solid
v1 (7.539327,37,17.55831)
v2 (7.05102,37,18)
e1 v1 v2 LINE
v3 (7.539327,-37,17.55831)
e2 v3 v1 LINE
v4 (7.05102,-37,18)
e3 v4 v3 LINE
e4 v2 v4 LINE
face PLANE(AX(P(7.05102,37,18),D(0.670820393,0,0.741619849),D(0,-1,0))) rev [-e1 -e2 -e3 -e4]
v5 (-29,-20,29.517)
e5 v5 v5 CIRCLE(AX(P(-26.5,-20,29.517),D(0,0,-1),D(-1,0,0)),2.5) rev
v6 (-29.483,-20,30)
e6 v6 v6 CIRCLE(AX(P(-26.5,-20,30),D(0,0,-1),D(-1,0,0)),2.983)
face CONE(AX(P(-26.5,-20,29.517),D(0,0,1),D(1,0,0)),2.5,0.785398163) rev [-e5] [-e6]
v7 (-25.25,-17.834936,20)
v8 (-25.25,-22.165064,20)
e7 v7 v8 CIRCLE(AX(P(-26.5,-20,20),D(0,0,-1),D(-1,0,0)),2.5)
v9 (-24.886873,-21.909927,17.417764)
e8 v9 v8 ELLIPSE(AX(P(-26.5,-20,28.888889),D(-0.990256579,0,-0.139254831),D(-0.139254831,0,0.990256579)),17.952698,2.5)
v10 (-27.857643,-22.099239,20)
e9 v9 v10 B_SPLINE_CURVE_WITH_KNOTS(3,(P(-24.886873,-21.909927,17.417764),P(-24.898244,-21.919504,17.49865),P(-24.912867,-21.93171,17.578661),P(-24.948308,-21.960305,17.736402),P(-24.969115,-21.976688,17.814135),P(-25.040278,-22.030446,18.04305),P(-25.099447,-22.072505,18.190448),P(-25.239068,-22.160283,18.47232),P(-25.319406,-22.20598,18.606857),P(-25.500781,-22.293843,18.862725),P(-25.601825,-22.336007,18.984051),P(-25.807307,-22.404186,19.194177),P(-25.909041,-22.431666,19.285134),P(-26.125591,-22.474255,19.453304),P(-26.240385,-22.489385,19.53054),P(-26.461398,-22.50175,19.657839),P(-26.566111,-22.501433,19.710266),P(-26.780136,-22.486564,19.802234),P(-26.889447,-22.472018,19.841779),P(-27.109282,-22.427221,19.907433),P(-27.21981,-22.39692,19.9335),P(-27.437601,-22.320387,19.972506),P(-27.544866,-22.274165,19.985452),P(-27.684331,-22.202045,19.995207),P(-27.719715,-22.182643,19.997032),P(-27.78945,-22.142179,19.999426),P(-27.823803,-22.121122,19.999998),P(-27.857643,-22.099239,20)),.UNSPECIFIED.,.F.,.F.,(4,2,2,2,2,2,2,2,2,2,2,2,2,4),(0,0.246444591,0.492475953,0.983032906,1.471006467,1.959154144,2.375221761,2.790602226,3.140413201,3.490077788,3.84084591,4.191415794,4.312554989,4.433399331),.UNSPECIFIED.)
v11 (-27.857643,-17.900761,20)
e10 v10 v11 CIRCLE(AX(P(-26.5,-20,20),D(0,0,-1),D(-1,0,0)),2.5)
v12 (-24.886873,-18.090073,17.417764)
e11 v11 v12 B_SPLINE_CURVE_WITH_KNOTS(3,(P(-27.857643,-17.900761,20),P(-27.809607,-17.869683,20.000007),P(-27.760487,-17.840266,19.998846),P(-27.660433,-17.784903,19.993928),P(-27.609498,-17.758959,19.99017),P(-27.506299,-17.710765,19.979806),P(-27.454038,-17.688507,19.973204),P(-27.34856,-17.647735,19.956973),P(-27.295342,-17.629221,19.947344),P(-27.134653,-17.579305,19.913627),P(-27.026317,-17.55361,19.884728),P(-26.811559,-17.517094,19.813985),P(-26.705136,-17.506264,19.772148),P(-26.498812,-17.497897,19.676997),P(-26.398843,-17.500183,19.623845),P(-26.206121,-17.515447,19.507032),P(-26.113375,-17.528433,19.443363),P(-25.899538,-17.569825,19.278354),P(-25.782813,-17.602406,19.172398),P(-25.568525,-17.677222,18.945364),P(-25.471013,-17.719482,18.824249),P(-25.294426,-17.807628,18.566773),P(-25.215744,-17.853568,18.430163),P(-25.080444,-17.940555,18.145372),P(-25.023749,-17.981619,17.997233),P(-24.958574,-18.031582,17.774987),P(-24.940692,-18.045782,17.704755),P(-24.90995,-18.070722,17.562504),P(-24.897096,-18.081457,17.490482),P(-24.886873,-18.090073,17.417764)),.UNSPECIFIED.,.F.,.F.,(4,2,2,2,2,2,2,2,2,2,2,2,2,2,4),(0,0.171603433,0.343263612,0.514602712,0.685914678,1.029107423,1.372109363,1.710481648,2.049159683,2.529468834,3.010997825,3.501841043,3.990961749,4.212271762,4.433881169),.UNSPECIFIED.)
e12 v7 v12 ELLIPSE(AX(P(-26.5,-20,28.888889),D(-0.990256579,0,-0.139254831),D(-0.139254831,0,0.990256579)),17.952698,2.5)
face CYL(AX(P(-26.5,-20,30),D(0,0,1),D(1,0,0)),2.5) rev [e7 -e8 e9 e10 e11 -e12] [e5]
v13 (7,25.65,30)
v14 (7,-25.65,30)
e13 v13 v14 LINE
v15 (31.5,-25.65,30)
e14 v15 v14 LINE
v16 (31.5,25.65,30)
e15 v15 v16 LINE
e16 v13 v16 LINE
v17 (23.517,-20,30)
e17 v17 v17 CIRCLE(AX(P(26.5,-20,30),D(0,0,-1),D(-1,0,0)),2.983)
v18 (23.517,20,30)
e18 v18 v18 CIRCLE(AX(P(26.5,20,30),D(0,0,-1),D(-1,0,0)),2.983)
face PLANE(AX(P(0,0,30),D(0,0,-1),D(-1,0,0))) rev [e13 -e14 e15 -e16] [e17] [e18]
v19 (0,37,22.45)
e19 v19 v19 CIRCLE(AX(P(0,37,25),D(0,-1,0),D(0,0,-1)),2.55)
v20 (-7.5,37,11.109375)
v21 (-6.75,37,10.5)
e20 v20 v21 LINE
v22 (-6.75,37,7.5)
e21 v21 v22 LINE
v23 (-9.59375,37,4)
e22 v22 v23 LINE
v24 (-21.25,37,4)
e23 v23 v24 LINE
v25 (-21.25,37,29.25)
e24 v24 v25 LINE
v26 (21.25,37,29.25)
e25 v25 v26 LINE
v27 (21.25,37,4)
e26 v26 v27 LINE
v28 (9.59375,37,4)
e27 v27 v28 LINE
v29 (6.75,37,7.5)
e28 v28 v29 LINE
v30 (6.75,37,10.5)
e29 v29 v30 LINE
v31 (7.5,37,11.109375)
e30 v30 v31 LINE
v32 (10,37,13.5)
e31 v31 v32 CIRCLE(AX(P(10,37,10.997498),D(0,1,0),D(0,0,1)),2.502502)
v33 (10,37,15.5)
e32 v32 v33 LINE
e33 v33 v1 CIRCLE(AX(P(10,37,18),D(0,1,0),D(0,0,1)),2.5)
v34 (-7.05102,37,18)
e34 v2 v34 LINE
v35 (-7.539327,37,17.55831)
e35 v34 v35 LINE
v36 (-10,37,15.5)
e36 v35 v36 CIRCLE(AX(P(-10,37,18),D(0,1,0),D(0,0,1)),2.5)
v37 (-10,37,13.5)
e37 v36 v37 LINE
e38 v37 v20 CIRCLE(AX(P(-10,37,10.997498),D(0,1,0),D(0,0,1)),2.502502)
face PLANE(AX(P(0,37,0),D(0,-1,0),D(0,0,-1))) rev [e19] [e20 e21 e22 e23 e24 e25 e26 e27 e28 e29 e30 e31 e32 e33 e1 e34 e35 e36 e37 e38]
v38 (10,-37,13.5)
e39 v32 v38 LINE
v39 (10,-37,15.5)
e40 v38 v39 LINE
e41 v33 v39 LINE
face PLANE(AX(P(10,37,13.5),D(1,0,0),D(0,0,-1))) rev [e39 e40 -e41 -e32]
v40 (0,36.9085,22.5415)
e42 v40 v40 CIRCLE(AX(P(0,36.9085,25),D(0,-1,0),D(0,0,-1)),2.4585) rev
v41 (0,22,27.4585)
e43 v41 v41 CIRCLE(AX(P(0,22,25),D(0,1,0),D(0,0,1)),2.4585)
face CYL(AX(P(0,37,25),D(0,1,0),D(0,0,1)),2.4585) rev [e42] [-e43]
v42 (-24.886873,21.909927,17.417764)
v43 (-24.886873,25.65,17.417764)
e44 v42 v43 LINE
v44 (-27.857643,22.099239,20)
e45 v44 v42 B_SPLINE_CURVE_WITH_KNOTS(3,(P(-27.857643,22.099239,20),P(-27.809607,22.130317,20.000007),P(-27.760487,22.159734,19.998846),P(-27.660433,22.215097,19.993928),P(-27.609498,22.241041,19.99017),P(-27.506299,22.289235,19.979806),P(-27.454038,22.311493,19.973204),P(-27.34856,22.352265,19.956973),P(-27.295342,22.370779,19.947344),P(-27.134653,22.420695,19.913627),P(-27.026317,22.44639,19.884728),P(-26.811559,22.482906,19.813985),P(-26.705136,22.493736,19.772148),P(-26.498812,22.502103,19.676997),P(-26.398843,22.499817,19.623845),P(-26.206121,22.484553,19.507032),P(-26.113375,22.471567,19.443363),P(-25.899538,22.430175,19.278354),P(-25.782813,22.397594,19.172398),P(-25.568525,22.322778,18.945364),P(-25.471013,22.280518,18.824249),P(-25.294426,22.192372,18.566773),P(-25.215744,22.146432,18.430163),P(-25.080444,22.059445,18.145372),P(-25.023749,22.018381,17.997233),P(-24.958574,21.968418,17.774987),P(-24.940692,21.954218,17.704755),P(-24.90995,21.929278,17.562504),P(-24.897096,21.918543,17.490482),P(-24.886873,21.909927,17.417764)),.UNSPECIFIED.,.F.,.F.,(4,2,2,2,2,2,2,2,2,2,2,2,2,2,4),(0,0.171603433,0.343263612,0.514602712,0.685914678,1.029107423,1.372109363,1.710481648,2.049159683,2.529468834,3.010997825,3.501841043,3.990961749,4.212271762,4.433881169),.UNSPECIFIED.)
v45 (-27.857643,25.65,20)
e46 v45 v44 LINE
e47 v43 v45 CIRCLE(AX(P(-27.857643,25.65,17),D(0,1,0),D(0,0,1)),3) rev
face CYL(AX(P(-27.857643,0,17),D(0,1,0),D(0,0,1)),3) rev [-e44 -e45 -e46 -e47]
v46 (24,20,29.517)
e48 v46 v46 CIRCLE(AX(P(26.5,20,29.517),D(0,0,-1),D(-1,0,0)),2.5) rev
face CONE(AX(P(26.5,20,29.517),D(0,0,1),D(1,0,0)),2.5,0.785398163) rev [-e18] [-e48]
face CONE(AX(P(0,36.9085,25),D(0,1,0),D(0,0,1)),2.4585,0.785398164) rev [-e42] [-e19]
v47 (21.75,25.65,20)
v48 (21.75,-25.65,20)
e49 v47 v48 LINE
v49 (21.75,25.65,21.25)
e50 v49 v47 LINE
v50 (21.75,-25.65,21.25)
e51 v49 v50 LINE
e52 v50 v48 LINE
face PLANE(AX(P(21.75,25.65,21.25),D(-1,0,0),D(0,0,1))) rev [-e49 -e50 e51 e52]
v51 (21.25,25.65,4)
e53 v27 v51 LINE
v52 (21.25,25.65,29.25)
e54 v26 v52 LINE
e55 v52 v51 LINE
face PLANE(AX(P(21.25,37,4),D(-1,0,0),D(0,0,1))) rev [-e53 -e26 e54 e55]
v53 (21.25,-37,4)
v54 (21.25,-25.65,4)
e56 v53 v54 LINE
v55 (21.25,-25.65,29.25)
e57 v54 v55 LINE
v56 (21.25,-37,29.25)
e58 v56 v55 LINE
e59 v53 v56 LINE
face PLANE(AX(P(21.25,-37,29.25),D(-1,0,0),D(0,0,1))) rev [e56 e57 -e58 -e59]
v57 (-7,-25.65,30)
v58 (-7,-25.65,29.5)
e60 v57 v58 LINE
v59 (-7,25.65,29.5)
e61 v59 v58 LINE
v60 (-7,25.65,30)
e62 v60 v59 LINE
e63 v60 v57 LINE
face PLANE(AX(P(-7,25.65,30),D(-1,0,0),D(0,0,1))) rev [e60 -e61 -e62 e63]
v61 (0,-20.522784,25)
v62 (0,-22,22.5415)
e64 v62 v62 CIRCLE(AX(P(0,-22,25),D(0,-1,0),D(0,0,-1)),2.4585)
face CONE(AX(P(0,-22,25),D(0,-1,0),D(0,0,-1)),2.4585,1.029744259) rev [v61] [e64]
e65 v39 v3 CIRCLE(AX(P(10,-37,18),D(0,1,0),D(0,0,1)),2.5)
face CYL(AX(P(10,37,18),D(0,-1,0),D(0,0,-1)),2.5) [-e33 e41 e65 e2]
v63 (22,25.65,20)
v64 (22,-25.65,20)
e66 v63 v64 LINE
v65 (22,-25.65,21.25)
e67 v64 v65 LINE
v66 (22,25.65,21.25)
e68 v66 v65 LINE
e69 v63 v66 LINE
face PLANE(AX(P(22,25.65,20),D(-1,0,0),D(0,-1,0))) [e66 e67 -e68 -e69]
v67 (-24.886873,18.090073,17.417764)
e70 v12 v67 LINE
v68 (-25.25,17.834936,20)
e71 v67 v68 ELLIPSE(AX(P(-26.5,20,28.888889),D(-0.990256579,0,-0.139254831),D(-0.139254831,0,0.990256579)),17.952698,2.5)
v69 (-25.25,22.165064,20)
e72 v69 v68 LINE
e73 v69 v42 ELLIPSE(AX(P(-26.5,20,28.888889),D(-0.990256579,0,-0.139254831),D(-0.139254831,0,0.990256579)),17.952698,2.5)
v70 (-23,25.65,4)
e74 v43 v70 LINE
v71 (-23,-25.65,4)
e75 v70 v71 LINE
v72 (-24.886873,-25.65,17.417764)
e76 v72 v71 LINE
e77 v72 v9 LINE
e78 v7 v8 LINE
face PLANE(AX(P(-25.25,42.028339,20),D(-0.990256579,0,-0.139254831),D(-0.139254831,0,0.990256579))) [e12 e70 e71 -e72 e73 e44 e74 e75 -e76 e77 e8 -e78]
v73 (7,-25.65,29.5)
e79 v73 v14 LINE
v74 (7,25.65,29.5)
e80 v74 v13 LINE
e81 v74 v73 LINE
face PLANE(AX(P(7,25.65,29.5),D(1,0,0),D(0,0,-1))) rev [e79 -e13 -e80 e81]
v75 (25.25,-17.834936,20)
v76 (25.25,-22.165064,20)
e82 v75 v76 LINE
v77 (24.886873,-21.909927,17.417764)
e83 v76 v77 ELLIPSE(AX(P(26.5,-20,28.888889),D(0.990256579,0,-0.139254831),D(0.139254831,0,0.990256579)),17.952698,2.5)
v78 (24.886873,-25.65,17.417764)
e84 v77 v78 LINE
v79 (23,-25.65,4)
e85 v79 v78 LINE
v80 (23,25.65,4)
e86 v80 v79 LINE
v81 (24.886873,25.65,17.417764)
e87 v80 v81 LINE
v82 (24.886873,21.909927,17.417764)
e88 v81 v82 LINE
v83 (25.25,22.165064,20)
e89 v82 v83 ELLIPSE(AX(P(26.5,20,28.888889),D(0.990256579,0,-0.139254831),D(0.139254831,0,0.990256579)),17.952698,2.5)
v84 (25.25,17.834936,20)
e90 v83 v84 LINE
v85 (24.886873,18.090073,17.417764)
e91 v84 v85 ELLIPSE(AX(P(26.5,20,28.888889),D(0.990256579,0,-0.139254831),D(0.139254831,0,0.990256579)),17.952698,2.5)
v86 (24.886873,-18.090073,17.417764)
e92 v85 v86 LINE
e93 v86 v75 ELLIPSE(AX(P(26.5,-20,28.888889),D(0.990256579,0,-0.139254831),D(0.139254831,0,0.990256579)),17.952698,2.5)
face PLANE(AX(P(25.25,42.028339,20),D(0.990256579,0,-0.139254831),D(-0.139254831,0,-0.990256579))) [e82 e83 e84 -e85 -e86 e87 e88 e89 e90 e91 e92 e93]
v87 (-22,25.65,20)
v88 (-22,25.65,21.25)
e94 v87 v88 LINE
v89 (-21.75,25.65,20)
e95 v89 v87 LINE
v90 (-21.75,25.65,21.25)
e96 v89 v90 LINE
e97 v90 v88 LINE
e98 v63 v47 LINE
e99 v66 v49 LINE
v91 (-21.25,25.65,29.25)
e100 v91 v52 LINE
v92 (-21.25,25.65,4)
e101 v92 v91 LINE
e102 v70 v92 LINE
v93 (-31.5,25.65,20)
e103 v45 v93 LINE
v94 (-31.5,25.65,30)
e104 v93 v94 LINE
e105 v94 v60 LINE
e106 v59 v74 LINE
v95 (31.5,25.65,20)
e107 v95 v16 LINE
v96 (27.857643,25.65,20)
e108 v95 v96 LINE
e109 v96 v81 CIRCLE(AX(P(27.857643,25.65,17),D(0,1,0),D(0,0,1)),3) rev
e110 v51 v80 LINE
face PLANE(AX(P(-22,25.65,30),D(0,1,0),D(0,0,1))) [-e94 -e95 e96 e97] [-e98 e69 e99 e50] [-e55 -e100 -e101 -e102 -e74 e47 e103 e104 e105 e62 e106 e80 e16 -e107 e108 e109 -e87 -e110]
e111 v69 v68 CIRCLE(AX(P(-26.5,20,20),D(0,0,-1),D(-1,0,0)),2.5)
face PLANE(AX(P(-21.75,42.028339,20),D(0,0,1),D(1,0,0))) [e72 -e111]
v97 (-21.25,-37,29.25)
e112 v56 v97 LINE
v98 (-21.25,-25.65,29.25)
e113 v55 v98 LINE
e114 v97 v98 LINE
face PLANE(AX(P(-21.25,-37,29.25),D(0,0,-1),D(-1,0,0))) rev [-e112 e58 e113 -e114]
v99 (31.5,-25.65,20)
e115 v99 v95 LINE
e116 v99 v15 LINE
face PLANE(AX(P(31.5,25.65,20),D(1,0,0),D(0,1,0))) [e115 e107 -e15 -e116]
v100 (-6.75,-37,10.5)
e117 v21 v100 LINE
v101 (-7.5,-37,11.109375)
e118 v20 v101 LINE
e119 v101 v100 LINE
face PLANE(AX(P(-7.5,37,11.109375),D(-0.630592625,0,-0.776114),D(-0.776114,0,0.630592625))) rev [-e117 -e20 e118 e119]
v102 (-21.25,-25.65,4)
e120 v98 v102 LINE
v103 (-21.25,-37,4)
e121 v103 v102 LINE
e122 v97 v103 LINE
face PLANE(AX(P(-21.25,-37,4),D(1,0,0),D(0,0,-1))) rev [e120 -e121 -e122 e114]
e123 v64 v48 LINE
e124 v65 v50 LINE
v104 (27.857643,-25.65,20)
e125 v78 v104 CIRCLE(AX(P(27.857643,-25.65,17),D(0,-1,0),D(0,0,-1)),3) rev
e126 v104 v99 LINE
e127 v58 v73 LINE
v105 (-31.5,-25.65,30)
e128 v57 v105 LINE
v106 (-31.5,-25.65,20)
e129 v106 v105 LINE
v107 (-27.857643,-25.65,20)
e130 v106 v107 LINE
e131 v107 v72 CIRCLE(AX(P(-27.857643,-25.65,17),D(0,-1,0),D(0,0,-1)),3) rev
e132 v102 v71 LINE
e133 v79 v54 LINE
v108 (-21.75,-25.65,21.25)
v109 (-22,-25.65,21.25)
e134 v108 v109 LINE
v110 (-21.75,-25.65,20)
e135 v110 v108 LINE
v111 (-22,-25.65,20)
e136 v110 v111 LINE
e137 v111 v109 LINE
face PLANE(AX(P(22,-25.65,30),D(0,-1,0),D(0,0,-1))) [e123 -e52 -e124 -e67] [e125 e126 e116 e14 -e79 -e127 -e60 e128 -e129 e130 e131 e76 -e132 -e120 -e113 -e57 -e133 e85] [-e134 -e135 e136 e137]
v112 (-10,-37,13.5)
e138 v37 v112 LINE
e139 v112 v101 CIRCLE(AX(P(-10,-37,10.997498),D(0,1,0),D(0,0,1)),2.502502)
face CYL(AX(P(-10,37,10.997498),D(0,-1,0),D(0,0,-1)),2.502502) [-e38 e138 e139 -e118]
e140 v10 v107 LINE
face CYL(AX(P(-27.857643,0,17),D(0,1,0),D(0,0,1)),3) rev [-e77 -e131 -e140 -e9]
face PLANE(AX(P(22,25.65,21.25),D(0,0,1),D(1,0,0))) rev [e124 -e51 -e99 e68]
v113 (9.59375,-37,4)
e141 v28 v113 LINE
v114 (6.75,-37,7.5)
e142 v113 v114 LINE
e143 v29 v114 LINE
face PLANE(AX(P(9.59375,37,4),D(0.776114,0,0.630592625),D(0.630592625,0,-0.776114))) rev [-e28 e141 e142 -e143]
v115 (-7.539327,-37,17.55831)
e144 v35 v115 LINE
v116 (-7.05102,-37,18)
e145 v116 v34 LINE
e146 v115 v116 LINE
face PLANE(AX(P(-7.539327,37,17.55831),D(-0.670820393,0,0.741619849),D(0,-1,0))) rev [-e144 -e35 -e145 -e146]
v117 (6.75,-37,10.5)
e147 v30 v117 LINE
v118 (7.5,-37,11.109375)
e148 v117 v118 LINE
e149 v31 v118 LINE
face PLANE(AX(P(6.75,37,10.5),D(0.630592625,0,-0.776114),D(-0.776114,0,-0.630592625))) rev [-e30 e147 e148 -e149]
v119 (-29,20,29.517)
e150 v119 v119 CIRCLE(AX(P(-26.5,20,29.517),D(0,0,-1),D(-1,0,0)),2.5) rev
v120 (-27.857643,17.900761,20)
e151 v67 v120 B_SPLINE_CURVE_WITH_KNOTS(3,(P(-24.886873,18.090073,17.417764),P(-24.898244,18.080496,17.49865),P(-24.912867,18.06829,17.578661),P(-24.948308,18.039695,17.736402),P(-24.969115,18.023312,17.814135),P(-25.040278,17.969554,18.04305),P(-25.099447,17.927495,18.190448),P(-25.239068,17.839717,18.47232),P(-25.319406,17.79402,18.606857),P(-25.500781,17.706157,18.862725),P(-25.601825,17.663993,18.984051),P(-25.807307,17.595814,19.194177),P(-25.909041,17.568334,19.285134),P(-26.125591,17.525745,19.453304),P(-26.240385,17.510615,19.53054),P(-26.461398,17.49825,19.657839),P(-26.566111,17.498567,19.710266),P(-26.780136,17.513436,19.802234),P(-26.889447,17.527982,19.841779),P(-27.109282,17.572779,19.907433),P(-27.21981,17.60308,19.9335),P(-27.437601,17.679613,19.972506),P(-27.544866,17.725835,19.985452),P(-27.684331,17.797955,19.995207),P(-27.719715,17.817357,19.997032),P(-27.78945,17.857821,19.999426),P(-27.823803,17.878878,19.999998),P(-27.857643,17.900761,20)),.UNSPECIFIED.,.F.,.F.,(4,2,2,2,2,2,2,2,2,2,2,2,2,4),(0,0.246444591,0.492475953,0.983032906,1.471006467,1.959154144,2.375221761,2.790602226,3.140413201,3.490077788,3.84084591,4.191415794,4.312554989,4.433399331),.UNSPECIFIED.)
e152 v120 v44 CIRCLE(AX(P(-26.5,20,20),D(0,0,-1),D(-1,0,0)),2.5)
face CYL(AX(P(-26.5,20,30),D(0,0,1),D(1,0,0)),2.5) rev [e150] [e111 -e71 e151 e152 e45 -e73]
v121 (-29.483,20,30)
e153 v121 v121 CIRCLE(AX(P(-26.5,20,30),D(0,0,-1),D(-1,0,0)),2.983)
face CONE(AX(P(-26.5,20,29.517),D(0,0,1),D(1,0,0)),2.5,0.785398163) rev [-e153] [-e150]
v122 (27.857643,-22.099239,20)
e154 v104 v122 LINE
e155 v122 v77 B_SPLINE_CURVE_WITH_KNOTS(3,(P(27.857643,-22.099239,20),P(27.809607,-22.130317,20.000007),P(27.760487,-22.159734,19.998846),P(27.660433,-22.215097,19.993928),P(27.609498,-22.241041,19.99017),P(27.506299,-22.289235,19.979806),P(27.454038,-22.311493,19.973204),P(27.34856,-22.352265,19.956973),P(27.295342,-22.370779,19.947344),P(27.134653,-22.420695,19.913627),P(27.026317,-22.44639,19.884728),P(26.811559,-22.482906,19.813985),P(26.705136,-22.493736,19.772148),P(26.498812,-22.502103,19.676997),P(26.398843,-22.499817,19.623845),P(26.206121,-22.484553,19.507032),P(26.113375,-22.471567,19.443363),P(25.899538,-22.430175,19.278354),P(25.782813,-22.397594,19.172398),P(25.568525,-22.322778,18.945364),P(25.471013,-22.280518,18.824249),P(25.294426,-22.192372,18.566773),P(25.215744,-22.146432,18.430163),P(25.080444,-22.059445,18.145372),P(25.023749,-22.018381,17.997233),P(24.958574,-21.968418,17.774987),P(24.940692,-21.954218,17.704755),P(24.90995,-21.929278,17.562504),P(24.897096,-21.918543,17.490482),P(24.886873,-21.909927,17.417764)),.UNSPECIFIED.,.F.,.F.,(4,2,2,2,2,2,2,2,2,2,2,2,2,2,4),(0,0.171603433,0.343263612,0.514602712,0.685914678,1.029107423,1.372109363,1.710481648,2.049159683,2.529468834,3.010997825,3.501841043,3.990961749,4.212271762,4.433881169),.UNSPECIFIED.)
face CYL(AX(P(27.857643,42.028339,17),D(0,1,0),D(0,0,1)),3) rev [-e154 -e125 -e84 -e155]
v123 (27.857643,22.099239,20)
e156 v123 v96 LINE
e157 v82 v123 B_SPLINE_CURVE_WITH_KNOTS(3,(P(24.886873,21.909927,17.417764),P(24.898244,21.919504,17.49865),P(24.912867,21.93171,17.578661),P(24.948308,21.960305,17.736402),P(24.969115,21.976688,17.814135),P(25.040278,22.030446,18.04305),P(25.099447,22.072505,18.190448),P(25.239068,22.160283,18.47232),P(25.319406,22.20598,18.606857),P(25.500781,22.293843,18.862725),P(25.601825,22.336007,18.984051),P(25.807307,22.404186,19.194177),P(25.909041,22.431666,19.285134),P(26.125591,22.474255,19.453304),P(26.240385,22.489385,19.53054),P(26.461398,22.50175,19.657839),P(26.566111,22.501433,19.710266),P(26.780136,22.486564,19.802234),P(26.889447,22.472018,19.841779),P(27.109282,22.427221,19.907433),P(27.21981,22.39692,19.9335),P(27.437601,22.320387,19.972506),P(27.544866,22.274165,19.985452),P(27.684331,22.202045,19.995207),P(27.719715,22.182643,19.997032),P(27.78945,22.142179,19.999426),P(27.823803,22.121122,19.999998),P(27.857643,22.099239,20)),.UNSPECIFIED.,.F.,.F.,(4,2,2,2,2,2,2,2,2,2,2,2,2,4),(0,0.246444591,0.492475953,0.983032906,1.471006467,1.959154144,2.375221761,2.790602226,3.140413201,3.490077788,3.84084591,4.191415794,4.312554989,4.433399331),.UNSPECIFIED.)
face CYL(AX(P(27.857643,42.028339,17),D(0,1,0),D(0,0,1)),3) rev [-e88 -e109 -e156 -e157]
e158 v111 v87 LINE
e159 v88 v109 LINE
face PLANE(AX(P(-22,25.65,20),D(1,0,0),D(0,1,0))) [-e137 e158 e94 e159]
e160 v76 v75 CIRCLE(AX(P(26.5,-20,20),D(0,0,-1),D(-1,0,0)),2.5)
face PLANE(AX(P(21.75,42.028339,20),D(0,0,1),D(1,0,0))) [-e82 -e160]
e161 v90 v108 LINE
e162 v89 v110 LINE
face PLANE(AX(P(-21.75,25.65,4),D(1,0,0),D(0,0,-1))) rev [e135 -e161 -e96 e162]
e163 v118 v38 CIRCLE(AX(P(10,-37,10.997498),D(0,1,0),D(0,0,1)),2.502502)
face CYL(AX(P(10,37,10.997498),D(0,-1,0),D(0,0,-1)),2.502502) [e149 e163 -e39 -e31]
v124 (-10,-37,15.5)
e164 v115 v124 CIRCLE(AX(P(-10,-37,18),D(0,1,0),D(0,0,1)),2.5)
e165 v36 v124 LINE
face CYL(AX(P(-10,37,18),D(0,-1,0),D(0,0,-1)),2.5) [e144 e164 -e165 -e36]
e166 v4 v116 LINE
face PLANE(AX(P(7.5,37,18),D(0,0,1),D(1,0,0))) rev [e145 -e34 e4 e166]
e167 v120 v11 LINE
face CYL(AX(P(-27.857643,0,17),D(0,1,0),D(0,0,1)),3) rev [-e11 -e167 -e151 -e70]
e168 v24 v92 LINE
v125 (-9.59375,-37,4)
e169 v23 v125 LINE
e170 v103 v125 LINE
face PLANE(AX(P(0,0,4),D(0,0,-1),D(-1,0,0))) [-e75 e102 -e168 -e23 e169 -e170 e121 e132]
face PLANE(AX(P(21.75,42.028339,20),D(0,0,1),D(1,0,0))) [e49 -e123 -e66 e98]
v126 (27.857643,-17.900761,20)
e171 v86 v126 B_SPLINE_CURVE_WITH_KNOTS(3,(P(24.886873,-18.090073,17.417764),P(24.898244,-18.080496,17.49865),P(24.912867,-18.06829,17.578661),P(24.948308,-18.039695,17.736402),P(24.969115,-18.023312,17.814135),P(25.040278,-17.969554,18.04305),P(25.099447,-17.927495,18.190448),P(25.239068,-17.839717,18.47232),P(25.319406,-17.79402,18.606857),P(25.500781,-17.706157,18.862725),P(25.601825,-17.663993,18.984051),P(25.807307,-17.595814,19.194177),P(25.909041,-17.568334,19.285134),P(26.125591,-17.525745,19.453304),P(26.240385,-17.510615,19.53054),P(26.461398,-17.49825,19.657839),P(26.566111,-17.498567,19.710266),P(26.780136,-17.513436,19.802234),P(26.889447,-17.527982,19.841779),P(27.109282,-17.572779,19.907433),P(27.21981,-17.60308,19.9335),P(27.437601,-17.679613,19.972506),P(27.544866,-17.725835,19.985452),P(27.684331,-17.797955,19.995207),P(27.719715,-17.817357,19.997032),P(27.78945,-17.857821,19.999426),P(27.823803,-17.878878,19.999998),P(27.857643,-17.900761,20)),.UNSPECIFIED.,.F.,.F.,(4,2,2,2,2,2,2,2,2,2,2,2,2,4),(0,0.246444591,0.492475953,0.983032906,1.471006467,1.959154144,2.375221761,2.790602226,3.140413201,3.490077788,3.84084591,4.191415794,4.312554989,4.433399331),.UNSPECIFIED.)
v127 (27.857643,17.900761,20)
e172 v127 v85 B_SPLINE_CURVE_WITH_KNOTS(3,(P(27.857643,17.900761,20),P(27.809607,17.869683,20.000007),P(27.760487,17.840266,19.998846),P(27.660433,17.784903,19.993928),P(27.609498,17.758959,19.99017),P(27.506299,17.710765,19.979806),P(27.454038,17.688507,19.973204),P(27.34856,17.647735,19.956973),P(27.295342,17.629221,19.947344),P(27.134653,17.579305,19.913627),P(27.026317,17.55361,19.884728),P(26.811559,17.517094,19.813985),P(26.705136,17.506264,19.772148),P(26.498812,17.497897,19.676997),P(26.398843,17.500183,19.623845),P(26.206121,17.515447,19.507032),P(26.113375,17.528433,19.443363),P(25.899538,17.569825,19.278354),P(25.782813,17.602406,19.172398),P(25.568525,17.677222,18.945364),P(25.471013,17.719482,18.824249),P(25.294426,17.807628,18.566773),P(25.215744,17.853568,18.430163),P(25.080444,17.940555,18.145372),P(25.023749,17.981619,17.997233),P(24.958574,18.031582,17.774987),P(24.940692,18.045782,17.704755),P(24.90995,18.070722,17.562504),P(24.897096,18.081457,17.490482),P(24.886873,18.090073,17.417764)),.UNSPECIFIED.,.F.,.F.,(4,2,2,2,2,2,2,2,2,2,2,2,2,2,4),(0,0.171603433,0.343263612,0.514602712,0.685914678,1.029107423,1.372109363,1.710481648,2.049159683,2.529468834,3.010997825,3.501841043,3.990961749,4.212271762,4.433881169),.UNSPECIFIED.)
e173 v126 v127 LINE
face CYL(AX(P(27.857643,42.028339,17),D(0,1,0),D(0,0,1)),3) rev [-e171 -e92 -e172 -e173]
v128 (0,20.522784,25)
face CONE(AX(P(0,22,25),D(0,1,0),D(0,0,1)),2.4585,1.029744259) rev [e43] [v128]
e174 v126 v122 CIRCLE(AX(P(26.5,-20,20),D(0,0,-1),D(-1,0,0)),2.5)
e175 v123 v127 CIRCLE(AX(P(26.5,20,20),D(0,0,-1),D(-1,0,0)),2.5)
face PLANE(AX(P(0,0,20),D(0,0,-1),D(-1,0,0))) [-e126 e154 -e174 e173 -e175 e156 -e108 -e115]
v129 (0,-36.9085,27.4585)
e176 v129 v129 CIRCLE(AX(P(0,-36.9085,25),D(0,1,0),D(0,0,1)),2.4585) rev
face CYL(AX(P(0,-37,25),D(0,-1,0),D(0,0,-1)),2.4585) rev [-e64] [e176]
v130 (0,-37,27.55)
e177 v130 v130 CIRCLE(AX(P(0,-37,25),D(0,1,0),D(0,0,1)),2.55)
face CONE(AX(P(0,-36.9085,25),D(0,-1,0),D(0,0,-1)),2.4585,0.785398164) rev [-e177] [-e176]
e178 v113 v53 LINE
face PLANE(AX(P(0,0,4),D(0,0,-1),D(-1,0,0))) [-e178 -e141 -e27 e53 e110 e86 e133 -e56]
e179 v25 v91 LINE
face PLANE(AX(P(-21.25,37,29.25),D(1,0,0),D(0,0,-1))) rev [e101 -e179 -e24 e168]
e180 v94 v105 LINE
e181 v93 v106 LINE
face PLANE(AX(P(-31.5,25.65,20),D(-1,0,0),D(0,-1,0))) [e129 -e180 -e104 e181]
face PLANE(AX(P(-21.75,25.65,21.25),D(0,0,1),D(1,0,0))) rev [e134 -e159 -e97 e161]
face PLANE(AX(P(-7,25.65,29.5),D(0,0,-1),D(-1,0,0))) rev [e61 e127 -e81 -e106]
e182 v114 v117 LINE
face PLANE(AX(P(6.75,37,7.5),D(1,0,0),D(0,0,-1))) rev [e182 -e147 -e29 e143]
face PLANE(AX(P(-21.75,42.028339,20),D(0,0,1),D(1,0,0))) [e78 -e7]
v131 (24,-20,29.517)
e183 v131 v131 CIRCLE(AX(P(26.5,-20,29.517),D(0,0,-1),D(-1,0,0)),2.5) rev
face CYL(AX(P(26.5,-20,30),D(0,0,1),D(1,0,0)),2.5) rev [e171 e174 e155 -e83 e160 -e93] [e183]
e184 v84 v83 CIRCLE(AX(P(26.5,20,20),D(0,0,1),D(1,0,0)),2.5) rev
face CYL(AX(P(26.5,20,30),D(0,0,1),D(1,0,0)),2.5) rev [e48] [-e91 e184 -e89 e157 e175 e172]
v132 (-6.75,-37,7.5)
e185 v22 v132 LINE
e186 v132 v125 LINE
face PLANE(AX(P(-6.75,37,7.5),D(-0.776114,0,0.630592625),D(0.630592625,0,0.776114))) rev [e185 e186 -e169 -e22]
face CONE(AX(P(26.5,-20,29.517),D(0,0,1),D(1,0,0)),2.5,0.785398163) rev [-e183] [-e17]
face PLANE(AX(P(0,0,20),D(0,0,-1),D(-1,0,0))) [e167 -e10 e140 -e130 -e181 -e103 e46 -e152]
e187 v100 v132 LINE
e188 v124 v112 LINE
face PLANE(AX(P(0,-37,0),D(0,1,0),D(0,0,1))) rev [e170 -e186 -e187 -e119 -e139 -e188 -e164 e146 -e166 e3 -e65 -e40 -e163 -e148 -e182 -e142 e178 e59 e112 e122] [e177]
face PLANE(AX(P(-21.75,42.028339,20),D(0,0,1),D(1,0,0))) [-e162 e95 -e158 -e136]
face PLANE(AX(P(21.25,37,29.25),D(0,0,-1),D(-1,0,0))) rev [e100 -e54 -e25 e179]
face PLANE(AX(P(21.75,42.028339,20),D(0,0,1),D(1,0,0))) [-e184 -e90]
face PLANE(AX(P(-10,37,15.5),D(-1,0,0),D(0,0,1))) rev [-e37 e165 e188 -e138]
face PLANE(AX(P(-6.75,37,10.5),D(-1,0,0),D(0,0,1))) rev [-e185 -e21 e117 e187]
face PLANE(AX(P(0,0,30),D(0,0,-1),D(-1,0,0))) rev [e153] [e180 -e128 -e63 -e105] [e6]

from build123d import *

# Parameters (mm, degrees)
SKIZZE1_W                       = 44
SKIZZE1_H                       = 51.3
AUFSATZ_LINEAR_AUSTRAGEN1_DEPTH = 26
SKIZZE2_W                       = 0.25
SKIZZE2_H                       = 17.25
SCHNITT_LINEAR_AUSTRAGEN1_DEPTH = 64.369472146
SKIZZE3_W                       = 14
SKIZZE3_H                       = 0.5
SCHNITT_LINEAR_AUSTRAGEN2_DEPTH = 64.369472146
SKIZZE4_W                       = 0.25
SKIZZE4_H                       = 17.25
SCHNITT_LINEAR_AUSTRAGEN3_DEPTH = 51.3
SKIZZE5_W                       = 42.5
SKIZZE5_H                       = 25.25
AUFSATZ_LINEAR_AUSTRAGEN2_DEPTH = 11.35
SKIZZE6_W                       = 42.5
SKIZZE6_H                       = 25.25
AUFSATZ_LINEAR_AUSTRAGEN3_DEPTH = 11.35
SKIZZE15_W                      = 9.5
SKIZZE15_H                      = 51.3
AUFSATZ_LINEAR_AUSTRAGEN5_DEPTH = 10
SCHNITT_LINEAR_AUSTRAGEN4_DEPTH = 86.838511171
BOHRUNG1_D                      = 4.917
BOHRUNG1_DEPTH                  = 15
BOHRUNG1_TIP                    = 1.477215832
BOHRUNG2_D                      = 4.917
BOHRUNG2_DEPTH                  = 15
BOHRUNG2_TIP                    = 1.477215832
M6_GEWINDEBOHRUNG1_D            = 5
M6_GEWINDEBOHRUNG1_DEPTH        = 17
M6_GEWINDEBOHRUNG1_TIP          = 1.502151548
FASE1_SIZE                      = 0.483
FASE2_SIZE                      = 0.448979592
FASE3_SIZE                      = 0.0915
FASE4_SIZE                      = 0.448979592
AUFSATZ_LINEAR_START            = -51.3
AUFSATZ_LINEAR_AUSTRAGEN6_DEPTH = 51.3
VERRUNDUNG1_R                   = 3


with BuildPart() as part:
    # Skizze1 → Aufsatz-Linear austragen1 (new body)
    with BuildSketch(Plane(origin=(0, 0, 4), x_dir=(-1, 0, 0), z_dir=(0, 0, -1))):
        Rectangle(SKIZZE1_W, SKIZZE1_H)
    extrude(amount=-AUFSATZ_LINEAR_AUSTRAGEN1_DEPTH)

    # Skizze2 → Schnitt-Linear austragen1 (cut, through all)
    with BuildSketch(Plane.XZ.offset(25.65)):
        with Locations((-21.875, 12.625)):
            Rectangle(SKIZZE2_W, SKIZZE2_H)
    extrude(amount=-SCHNITT_LINEAR_AUSTRAGEN1_DEPTH, mode=Mode.SUBTRACT)

    # Skizze3 → Schnitt-Linear austragen2 (cut, through all)
    with BuildSketch(Plane.XZ.offset(25.65)):
        with Locations((0, 29.75)):
            Rectangle(SKIZZE3_W, SKIZZE3_H)
    extrude(amount=-SCHNITT_LINEAR_AUSTRAGEN2_DEPTH, mode=Mode.SUBTRACT)

    # Skizze4 → Schnitt-Linear austragen3 (cut)
    with BuildSketch(Plane.XZ.offset(25.65)):
        with Locations((21.875, 12.625)):
            Rectangle(SKIZZE4_W, SKIZZE4_H)
    extrude(amount=-SCHNITT_LINEAR_AUSTRAGEN3_DEPTH, mode=Mode.SUBTRACT)

    # Skizze5 → Aufsatz-Linear austragen2 (add)
    with BuildSketch(Plane(origin=(0, 25.65, 0), x_dir=(-1, 0, 0), z_dir=(0, 1, 0))):
        with Locations((0, 16.625)):
            Rectangle(SKIZZE5_W, SKIZZE5_H)
    extrude(amount=AUFSATZ_LINEAR_AUSTRAGEN2_DEPTH)

    # Skizze6 → Aufsatz-Linear austragen3 (add)
    with BuildSketch(Plane.XZ.offset(25.65)):
        with Locations((0, 16.625)):
            Rectangle(SKIZZE6_W, SKIZZE6_H)
    extrude(amount=AUFSATZ_LINEAR_AUSTRAGEN3_DEPTH)

    # Skizze15 → Aufsatz-Linear austragen5 (add)
    with BuildSketch(Plane.XY.offset(30)):
        with Locations((-26.75, 0)):
            Rectangle(SKIZZE15_W, SKIZZE15_H)
        with Locations((26.75, 0)):
            Rectangle(SKIZZE15_W, SKIZZE15_H)
    extrude(amount=-AUFSATZ_LINEAR_AUSTRAGEN5_DEPTH)

    # Skizze7 → Schnitt-Linear austragen4 (cut, through all)
    with BuildSketch(Plane.XZ.offset(37)):
        with BuildLine():
            Line((-9.59375, 4), (9.59375, 4))
            Line((9.59375, 4), (6.75, 7.5))
            Line((6.75, 7.5), (6.75, 10.5))
            Line((6.75, 10.5), (7.5, 11.109375))
            ThreePointArc((7.5, 11.109375), (8.270470592, 12.806156162), (10, 13.5))
            Line((10, 13.5), (10, 15.5))
            ThreePointArc((10, 15.5), (8.232233047, 16.232233047), (7.5, 18))
            Line((7.5, 18), (-7.5, 18))
            ThreePointArc((-7.5, 18), (-8.232233047, 16.232233047), (-10, 15.5))
            Line((-10, 15.5), (-10, 13.5))
            ThreePointArc((-10, 13.5), (-8.270470592, 12.806156162), (-7.5, 11.109375))
            Line((-7.5, 11.109375), (-6.75, 10.5))
            Line((-6.75, 10.5), (-6.75, 7.5))
            Line((-6.75, 7.5), (-9.59375, 4))
        make_face()
    extrude(amount=-SCHNITT_LINEAR_AUSTRAGEN4_DEPTH, mode=Mode.SUBTRACT)

    # Bohrung1
    with Locations(Plane(origin=(0, -37, 0), x_dir=(-1, 0, 0), z_dir=(0, -1, 0))):
        with Locations((0, -25)):
            Hole(BOHRUNG1_D / 2, depth=BOHRUNG1_DEPTH)
            with Locations((0, 0, -(BOHRUNG1_DEPTH + BOHRUNG1_TIP / 2))):  # 118° drill point
                Cone(0, BOHRUNG1_D / 2, BOHRUNG1_TIP, mode=Mode.SUBTRACT)

    # Bohrung2
    with Locations(Plane(origin=(0, 37, 0), x_dir=(1, 0, 0), z_dir=(0, 1, 0))):
        with Locations((0, -25)):
            Hole(BOHRUNG2_D / 2, depth=BOHRUNG2_DEPTH)
            with Locations((0, 0, -(BOHRUNG2_DEPTH + BOHRUNG2_TIP / 2))):  # 118° drill point
                Cone(0, BOHRUNG2_D / 2, BOHRUNG2_TIP, mode=Mode.SUBTRACT)

    # M6 Gewindebohrung1
    with Locations(Plane.XY.offset(30)):
        with Locations((26.5, -20), (26.5, 20), (-26.5, 20), (-26.5, -20)):
            Hole(M6_GEWINDEBOHRUNG1_D / 2, depth=M6_GEWINDEBOHRUNG1_DEPTH)
            with Locations((0, 0, -(M6_GEWINDEBOHRUNG1_DEPTH + M6_GEWINDEBOHRUNG1_TIP / 2))):  # 118° drill point
                Cone(0, M6_GEWINDEBOHRUNG1_D / 2, M6_GEWINDEBOHRUNG1_TIP, mode=Mode.SUBTRACT)

    # Fase1
    fase1_edges = [part.edges().sort_by_distance(p)[0] for p in [
        (-24, -20, 30),
        (-24, 20, 30),
        (29, 20, 30),
        (29, -20, 30),
    ]]
    chamfer(fase1_edges, length=FASE1_SIZE)

    # Fase2
    # the kernel refuses this chamfer: 0.448979592, 0.406117321 mm, written as the material it adds along each edge
    with BuildSketch(Plane(origin=(-7.5, -37, 18), x_dir=(1, 0, 0), z_dir=(0, 1, 0))) as fase2_piece_1:
        with BuildLine():
            Line((FASE2_SIZE, 0), (-0.03932739, 0.441690284))
            ThreePointArc((-0.03932739, 0.441690284), (-0.010448273, 0.22832477), (0, 0))
            Line((0, 0), (FASE2_SIZE, 0))
        make_face()
    extrude(amount=74)

    # Fase3
    fase3_edges = [part.edges().sort_by_distance(p)[0] for p in [
        (-2.4585, -37, 25),
        (2.4585, 37, 25),
    ]]
    chamfer(fase3_edges, length=FASE3_SIZE)

    # Fase4
    # the kernel refuses this chamfer: 0.448979592, 0.406117321 mm, written as the material it adds along each edge
    with BuildSketch(Plane(origin=(7.5, -37, 18), x_dir=(0.08868753028202897, 0, -0.9960594972050988), z_dir=(0, 1, 0))) as fase4_piece_1:
        with BuildLine():
            Line((0.443437651, 0), (-FASE4_SIZE * 0.0886875302498, FASE4_SIZE * 0.996059496843))
            Line((-FASE4_SIZE * 0.0886875302498, FASE4_SIZE * 0.996059496843), (0, 0))
            ThreePointArc((0, 0), (0.228351687, 0.009842458), (0.443437651, 0))
        make_face()
    extrude(amount=74)

    # Skizze16 → Aufsatz-Linear austragen6 (add)
    with BuildSketch(Plane.XZ.offset(25.65).offset(AUFSATZ_LINEAR_START)):
        Polygon((-21.75, 4), (-21.75, 20), (-25.25, 20), (-23, 4), align=None)
        Polygon((21.75, 20), (25.25, 20), (23, 4), (21.75, 4), align=None)
    extrude(amount=AUFSATZ_LINEAR_AUSTRAGEN6_DEPTH)

    # Verrundung1
    # the kernel refuses this fillet: 3 mm, written as the material it adds along each edge
    with BuildSketch(Plane(origin=(-25.25, 25.65, 20), x_dir=(0.13925483139909986, 0, -0.9902565788380344), z_dir=(0, -1, 0))) as verrundung1_piece_1_section:
        with BuildLine():
            CenterArc((VERRUNDUNG1_R * 0.869214289504, -VERRUNDUNG1_R), VERRUNDUNG1_R, 90, 81.995271143)
            Line((-VERRUNDUNG1_R * 0.121042289335, -VERRUNDUNG1_R * 0.860745168601), (0, 0))
            Line((0, 0), (VERRUNDUNG1_R * 0.869214289504, 0))
        make_face()
    verrundung1_piece_1 = extrude(amount=10.004043662, mode=Mode.PRIVATE)
    verrundung1_piece_1 = verrundung1_piece_1 - Plane(origin=(-26.5, 20, 20), x_dir=(-1, 0, 0), z_dir=(0, 0, -1)) * Cylinder(2.5, 31, mode=Mode.PRIVATE)
    add(verrundung1_piece_1)
    with BuildSketch(Plane(origin=(-25.25, 24.354043662, 20), x_dir=(0.13925483139909986, 0, -0.9902565788380344), z_dir=(0, -1, 0))) as verrundung1_piece_2_section:
        with BuildLine():
            CenterArc((VERRUNDUNG1_R * 0.869214289504, -VERRUNDUNG1_R), VERRUNDUNG1_R, 90, 81.995271143)
            Line((-VERRUNDUNG1_R * 0.121042289335, -VERRUNDUNG1_R * 0.860745168601), (0, 0))
            Line((0, 0), (VERRUNDUNG1_R * 0.869214289504, 0))
        make_face()
    verrundung1_piece_2 = extrude(amount=48.708087324, mode=Mode.PRIVATE)
    verrundung1_piece_2 = verrundung1_piece_2 - Plane(origin=(-26.5, -20, 20), x_dir=(-1, 0, 0), z_dir=(0, 0, -1)) * Cylinder(2.5, 108, mode=Mode.PRIVATE)
    verrundung1_piece_2 = verrundung1_piece_2 - Plane(origin=(-26.5, 20, 20), x_dir=(-1, 0, 0), z_dir=(0, 0, -1)) * Cylinder(2.5, 108, mode=Mode.PRIVATE)
    add(verrundung1_piece_2)
    with BuildSketch(Plane(origin=(-25.25, -15.645956338, 20), x_dir=(0.13925483139909986, 0, -0.9902565788380344), z_dir=(0, -1, 0))) as verrundung1_piece_3_section:
        with BuildLine():
            CenterArc((VERRUNDUNG1_R * 0.869214289504, -VERRUNDUNG1_R), VERRUNDUNG1_R, 90, 81.995271143)
            Line((-VERRUNDUNG1_R * 0.121042289335, -VERRUNDUNG1_R * 0.860745168601), (0, 0))
            Line((0, 0), (VERRUNDUNG1_R * 0.869214289504, 0))
        make_face()
    verrundung1_piece_3 = extrude(amount=10.004043662, mode=Mode.PRIVATE)
    verrundung1_piece_3 = verrundung1_piece_3 - Plane(origin=(-26.5, -20, 20), x_dir=(-1, 0, 0), z_dir=(0, 0, -1)) * Cylinder(2.5, 31, mode=Mode.PRIVATE)
    add(verrundung1_piece_3)
    with BuildSketch(Plane(origin=(25.25, 25.65, 20), x_dir=(1, 0, 0), z_dir=(0, -1, 0))) as verrundung1_piece_4_section:
        with BuildLine():
            CenterArc((VERRUNDUNG1_R * 0.869214289504, -VERRUNDUNG1_R), VERRUNDUNG1_R, 90, 81.995271143)
            Line((-VERRUNDUNG1_R * 0.121042289335, -VERRUNDUNG1_R * 0.860745168601), (0, 0))
            Line((0, 0), (VERRUNDUNG1_R * 0.869214289504, 0))
        make_face()
    verrundung1_piece_4 = extrude(amount=10.004043662, mode=Mode.PRIVATE)
    verrundung1_piece_4 = verrundung1_piece_4 - Plane(origin=(26.5, 20, 20), x_dir=(-1, 0, 0), z_dir=(0, 0, -1)) * Cylinder(2.5, 31, mode=Mode.PRIVATE)
    add(verrundung1_piece_4)
    with BuildSketch(Plane(origin=(25.25, 24.354043662, 20), x_dir=(1, 0, 0), z_dir=(0, -1, 0))) as verrundung1_piece_5_section:
        with BuildLine():
            CenterArc((VERRUNDUNG1_R * 0.869214289504, -VERRUNDUNG1_R), VERRUNDUNG1_R, 90, 81.995271143)
            Line((-VERRUNDUNG1_R * 0.121042289335, -VERRUNDUNG1_R * 0.860745168601), (0, 0))
            Line((0, 0), (VERRUNDUNG1_R * 0.869214289504, 0))
        make_face()
    verrundung1_piece_5 = extrude(amount=48.708087324, mode=Mode.PRIVATE)
    verrundung1_piece_5 = verrundung1_piece_5 - Plane(origin=(26.5, -20, 20), x_dir=(-1, 0, 0), z_dir=(0, 0, -1)) * Cylinder(2.5, 108, mode=Mode.PRIVATE)
    verrundung1_piece_5 = verrundung1_piece_5 - Plane(origin=(26.5, 20, 20), x_dir=(-1, 0, 0), z_dir=(0, 0, -1)) * Cylinder(2.5, 108, mode=Mode.PRIVATE)
    add(verrundung1_piece_5)
    with BuildSketch(Plane(origin=(25.25, -15.645956338, 20), x_dir=(1, 0, 0), z_dir=(0, -1, 0))) as verrundung1_piece_6_section:
        with BuildLine():
            CenterArc((VERRUNDUNG1_R * 0.869214289504, -VERRUNDUNG1_R), VERRUNDUNG1_R, 90, 81.995271143)
            Line((-VERRUNDUNG1_R * 0.121042289335, -VERRUNDUNG1_R * 0.860745168601), (0, 0))
            Line((0, 0), (VERRUNDUNG1_R * 0.869214289504, 0))
        make_face()
    verrundung1_piece_6 = extrude(amount=10.004043662, mode=Mode.PRIVATE)
    verrundung1_piece_6 = verrundung1_piece_6 - Plane(origin=(26.5, -20, 20), x_dir=(-1, 0, 0), z_dir=(0, 0, -1)) * Cylinder(2.5, 31, mode=Mode.PRIVATE)
    add(verrundung1_piece_6)


solid = part.part
